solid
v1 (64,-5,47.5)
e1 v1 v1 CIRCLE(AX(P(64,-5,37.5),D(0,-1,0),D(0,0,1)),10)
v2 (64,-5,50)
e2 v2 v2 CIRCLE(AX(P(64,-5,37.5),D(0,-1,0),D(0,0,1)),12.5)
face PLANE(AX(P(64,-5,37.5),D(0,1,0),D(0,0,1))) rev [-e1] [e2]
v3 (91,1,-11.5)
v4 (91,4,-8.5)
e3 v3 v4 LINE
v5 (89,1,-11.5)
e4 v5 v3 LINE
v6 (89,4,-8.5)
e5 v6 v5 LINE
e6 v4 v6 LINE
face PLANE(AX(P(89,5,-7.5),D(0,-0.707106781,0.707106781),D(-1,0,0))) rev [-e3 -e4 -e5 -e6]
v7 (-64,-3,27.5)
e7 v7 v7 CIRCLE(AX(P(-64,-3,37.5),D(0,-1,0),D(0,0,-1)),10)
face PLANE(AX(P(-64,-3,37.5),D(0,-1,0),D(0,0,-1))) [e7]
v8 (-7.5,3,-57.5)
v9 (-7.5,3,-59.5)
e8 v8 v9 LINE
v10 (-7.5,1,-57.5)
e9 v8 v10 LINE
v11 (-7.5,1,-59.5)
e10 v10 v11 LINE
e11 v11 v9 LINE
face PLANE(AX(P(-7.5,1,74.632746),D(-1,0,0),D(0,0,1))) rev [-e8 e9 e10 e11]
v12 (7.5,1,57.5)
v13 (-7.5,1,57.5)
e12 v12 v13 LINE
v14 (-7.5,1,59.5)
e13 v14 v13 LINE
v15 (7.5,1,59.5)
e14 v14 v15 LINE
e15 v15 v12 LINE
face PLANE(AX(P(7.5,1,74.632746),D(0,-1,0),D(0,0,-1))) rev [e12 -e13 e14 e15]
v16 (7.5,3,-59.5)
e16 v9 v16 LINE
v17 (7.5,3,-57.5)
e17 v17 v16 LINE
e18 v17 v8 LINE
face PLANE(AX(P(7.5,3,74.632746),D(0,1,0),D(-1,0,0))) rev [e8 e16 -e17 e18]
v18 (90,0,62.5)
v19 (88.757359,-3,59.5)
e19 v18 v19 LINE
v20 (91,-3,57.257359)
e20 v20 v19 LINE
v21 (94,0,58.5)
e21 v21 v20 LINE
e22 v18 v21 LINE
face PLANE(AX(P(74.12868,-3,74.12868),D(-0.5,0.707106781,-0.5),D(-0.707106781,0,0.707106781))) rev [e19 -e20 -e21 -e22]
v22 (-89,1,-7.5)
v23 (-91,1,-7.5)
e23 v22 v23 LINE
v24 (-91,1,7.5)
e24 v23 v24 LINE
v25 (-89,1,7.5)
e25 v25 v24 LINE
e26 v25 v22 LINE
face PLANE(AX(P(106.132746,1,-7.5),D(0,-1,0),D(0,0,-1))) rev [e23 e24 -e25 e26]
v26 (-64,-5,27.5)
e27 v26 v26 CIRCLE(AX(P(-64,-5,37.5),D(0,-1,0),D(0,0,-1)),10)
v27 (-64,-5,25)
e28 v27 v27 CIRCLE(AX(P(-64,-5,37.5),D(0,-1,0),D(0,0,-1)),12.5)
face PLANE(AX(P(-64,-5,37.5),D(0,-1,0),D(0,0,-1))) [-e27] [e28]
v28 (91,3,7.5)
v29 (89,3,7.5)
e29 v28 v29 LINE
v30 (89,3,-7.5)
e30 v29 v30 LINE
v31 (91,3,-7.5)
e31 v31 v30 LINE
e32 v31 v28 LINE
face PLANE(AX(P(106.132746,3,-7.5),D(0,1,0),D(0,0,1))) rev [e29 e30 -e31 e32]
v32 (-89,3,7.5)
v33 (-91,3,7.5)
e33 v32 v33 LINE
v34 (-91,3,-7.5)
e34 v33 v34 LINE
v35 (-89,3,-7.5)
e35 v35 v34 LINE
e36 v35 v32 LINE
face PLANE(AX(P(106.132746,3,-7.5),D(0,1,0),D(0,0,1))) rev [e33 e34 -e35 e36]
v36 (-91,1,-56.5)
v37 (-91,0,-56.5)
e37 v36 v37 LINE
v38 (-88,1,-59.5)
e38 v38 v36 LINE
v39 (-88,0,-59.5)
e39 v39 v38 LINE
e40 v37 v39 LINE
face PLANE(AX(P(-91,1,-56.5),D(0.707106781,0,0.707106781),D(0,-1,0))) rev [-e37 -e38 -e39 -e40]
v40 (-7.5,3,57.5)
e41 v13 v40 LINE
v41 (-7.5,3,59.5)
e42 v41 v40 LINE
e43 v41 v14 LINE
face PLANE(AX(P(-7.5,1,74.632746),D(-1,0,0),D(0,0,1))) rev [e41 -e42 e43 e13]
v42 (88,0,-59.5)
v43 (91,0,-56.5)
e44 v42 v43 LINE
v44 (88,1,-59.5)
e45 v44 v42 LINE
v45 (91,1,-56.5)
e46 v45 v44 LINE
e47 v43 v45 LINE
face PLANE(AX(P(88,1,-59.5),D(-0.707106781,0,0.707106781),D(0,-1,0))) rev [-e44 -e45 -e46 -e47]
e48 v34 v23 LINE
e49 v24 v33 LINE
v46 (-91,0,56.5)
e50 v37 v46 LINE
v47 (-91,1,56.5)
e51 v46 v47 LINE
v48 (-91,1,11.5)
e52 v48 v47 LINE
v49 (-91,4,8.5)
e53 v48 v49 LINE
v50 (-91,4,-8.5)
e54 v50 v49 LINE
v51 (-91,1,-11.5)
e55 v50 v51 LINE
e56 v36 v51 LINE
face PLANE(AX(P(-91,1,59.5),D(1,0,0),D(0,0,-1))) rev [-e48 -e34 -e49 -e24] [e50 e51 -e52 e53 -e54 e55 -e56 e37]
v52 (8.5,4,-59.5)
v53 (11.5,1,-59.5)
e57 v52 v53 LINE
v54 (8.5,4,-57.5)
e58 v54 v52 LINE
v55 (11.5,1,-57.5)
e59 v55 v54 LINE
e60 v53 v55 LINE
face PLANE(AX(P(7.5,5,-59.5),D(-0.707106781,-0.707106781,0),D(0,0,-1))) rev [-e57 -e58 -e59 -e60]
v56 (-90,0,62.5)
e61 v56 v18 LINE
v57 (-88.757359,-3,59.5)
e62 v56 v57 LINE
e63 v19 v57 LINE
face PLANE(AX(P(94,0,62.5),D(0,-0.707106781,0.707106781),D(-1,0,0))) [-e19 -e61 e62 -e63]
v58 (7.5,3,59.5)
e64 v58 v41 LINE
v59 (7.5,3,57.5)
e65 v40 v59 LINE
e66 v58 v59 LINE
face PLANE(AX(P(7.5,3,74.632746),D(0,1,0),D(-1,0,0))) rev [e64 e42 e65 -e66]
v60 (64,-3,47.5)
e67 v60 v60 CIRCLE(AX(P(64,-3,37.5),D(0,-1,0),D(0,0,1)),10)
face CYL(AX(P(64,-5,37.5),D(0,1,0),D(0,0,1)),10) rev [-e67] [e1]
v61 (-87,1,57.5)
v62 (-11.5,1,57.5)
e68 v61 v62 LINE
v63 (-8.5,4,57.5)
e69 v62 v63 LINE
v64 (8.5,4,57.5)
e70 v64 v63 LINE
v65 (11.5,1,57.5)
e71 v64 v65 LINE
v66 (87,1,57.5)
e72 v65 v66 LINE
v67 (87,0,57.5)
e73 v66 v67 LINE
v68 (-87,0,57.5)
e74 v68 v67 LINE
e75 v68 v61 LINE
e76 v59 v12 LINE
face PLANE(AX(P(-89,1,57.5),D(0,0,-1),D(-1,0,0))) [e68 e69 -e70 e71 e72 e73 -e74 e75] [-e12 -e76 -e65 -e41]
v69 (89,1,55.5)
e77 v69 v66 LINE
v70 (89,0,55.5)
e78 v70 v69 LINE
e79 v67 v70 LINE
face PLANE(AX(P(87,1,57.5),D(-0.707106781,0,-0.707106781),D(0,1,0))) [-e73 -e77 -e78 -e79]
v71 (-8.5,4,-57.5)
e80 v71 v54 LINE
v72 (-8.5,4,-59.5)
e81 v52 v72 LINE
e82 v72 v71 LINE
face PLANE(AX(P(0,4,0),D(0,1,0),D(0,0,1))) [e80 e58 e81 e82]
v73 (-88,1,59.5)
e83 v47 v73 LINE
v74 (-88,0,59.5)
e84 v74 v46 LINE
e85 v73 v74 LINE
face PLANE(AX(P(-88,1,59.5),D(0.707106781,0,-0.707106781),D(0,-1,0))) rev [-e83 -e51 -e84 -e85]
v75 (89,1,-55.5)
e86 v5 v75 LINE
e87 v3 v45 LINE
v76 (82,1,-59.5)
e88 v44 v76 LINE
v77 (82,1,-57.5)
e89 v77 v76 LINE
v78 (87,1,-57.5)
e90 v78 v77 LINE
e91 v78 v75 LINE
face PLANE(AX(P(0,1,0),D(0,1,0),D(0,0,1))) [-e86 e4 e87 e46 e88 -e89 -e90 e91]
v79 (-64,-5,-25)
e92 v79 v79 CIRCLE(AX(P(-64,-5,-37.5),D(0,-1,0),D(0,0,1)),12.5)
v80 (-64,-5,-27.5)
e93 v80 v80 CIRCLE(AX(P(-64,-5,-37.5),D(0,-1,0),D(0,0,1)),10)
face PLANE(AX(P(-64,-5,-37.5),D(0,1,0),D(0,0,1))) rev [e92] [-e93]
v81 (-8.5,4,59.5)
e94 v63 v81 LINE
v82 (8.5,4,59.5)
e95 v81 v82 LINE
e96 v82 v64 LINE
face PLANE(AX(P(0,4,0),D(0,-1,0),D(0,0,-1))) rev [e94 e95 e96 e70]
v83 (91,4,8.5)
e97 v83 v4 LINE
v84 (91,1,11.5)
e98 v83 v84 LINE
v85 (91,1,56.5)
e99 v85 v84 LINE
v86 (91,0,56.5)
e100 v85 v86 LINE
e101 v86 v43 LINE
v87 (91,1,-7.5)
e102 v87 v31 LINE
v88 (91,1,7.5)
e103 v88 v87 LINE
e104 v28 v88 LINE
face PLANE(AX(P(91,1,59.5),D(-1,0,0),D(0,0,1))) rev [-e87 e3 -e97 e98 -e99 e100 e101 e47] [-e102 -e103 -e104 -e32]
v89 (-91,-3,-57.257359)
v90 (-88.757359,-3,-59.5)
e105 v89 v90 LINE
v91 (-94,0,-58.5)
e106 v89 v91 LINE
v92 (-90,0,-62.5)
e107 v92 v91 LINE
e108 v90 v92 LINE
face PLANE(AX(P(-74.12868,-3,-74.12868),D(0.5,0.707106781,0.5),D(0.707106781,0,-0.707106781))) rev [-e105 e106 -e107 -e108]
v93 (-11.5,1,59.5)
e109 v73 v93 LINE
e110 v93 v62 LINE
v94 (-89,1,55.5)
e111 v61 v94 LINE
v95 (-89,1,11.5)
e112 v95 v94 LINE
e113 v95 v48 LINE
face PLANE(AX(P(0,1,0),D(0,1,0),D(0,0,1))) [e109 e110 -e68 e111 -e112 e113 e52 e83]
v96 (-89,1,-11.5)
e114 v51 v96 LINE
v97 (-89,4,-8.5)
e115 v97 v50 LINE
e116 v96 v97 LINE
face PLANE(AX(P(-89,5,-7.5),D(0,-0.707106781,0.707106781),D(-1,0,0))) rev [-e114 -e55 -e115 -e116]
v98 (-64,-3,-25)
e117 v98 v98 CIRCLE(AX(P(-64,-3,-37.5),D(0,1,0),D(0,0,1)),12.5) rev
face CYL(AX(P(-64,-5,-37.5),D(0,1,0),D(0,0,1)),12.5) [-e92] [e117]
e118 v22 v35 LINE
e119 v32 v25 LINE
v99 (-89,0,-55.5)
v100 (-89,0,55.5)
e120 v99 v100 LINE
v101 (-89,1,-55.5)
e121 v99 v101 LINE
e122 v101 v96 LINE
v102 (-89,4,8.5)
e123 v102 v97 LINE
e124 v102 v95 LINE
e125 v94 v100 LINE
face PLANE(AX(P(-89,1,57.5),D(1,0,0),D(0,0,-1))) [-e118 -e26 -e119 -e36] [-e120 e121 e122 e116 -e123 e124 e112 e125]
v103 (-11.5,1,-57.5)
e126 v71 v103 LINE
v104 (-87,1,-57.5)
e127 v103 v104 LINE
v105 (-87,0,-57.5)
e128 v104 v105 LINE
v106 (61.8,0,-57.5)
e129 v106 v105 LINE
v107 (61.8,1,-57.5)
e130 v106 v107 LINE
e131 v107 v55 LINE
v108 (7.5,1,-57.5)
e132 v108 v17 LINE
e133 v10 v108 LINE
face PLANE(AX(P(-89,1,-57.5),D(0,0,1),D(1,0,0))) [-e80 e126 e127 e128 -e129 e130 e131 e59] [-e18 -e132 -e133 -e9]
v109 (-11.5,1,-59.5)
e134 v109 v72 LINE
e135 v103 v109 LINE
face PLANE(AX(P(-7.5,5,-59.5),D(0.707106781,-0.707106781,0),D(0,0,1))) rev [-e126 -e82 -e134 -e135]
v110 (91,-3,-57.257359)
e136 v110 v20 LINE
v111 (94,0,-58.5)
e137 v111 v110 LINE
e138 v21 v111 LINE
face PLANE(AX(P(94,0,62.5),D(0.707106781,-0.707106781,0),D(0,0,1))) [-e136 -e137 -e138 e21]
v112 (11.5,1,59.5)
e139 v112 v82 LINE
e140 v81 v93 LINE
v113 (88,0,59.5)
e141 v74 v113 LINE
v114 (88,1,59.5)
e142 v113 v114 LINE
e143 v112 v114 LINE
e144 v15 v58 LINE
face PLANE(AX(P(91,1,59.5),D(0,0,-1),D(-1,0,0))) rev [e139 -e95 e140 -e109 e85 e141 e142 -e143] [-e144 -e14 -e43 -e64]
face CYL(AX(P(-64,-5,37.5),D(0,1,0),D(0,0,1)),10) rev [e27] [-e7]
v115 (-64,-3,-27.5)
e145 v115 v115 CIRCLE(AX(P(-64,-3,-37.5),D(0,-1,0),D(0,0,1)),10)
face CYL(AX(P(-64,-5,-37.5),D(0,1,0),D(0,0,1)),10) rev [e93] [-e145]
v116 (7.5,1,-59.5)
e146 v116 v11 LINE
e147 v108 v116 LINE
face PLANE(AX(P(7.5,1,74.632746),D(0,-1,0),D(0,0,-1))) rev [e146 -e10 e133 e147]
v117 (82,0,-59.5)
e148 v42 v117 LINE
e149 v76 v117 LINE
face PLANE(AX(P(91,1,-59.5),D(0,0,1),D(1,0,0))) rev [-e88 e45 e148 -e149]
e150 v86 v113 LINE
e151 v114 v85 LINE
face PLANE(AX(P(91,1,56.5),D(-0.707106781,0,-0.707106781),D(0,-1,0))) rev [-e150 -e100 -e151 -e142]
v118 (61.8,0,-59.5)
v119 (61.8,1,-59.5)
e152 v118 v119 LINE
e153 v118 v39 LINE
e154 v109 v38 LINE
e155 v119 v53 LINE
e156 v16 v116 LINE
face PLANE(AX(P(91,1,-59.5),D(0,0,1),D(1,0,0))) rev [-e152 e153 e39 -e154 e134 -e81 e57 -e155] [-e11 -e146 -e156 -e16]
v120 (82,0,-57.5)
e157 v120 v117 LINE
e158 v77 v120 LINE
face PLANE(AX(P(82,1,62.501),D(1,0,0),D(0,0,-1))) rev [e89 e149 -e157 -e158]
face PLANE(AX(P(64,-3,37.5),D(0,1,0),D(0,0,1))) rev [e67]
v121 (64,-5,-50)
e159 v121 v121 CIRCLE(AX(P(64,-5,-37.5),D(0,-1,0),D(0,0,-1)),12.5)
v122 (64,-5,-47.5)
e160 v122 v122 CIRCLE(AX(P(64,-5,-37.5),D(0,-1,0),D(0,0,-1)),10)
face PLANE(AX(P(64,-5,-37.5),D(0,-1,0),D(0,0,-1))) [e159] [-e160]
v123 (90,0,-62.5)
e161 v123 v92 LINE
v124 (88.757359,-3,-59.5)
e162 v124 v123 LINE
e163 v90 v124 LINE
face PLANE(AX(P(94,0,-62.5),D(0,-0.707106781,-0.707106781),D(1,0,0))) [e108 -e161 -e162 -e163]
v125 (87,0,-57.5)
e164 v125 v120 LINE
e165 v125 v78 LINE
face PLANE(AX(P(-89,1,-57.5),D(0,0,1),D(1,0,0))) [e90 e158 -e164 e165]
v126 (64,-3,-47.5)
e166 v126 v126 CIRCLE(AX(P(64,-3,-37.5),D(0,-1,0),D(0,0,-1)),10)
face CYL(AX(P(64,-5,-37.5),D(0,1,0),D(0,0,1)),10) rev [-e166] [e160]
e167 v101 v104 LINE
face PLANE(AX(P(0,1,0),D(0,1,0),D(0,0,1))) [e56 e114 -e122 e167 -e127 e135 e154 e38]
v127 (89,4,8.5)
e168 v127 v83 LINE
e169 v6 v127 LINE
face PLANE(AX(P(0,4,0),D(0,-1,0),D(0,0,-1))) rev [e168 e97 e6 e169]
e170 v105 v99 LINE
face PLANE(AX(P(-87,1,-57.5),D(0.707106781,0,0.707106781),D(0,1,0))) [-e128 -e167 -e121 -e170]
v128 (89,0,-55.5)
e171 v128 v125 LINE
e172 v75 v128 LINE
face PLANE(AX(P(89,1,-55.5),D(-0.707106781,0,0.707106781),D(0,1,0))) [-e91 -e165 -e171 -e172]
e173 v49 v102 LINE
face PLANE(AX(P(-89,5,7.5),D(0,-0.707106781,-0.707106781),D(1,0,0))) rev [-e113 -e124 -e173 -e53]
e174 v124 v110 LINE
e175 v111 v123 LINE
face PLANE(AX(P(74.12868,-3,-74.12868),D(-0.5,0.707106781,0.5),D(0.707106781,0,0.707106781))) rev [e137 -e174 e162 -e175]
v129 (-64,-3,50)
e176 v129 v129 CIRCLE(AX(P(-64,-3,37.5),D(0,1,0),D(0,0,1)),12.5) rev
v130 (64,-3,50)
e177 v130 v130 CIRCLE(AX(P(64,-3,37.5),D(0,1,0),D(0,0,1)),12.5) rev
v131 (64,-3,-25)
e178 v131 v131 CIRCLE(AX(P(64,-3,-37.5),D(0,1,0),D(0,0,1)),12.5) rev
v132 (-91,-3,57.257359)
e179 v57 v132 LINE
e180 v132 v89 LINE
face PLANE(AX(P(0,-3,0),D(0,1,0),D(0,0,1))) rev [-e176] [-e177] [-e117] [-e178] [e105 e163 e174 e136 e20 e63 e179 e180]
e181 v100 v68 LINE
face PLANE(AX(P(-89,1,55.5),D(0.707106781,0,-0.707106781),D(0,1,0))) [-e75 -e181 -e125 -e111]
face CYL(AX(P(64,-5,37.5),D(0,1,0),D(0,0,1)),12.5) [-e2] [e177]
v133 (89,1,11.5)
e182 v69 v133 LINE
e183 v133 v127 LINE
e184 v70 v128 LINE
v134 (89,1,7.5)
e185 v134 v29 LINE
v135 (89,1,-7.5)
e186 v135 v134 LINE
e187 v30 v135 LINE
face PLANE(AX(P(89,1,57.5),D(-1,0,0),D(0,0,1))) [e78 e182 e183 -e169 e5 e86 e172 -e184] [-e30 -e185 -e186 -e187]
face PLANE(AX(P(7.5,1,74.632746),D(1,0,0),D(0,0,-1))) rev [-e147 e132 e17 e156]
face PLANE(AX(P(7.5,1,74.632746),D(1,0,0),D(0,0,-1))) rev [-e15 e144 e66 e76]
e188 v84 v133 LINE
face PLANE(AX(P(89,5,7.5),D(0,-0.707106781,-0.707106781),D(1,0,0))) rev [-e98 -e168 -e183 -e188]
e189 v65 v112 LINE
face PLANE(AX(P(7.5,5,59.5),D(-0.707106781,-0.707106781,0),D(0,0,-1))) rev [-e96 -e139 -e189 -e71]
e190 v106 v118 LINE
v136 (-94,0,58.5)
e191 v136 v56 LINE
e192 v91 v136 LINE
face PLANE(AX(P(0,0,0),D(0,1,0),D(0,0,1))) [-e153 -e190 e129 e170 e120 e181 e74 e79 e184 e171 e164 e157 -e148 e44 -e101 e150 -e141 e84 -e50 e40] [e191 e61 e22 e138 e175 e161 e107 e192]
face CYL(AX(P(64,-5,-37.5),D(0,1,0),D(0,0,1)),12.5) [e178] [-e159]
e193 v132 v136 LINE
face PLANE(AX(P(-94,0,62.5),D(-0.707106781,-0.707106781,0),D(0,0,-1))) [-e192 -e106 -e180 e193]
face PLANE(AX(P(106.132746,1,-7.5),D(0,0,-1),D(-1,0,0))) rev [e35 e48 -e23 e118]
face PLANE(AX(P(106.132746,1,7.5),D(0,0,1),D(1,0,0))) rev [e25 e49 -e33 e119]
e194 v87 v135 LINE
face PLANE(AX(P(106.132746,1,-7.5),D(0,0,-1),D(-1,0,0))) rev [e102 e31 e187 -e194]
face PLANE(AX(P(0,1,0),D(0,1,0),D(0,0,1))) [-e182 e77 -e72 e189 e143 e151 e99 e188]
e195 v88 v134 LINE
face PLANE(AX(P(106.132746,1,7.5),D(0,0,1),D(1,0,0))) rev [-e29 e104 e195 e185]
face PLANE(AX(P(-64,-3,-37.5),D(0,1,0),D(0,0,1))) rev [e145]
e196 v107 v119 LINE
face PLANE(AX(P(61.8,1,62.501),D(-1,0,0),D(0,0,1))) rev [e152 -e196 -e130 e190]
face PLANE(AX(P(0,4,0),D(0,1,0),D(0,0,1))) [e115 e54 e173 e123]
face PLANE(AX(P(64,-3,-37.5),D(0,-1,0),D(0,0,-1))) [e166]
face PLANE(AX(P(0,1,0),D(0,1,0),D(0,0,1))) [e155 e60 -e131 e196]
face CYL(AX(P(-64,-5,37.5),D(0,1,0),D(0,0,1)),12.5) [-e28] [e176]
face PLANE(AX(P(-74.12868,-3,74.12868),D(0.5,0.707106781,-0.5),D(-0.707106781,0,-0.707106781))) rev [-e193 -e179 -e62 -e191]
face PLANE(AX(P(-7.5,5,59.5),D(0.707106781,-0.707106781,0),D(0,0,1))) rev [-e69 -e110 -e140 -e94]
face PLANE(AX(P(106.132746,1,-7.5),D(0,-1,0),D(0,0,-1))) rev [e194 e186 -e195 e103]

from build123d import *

# Parameters (mm, degrees)
SKETCH_1_W          = 188
SKETCH_1_H          = 125
EXTRUDE_1_DEPTH     = 3
SKETCH_2_W          = 182
SKETCH_2_H          = 119
SKETCH_2_W_2        = 178
SKETCH_2_H_2        = 115
EXTRUDE_2_DEPTH     = 1
CUT_EXTRUDE_1_REACH = 156.042
SKETCH_4_W          = 20.2
SKETCH_4_H          = 1
SKETCH_5_W          = 15
SKETCH_5_H          = 2
SKETCH_5_W_2        = 2
SKETCH_5_H_2        = 15
EXTRUDE_3_DEPTH     = 3
CHAMFER_1_SIZE      = 4
CUT_EXTRUDE_2_REACH = 156.065
SKETCH_6_W          = 15
SKETCH_6_H          = 2
CUT_EXTRUDE_3_REACH = 197.313
SKETCH_7_W          = 15
SKETCH_7_H          = 2
SKETCH_8_R          = 12.5
EXTRUDE_4_DEPTH     = 2
SKETCH_9_R          = 10
CUT_EXTRUDE_4_DEPTH = 2
CHAMFER_2_SIZE      = 4
CHAMFER_3_SIZE      = 3
CHAMFER_4_SIZE      = 2
CHAMFER_5_SIZE      = 3


# Some blends are built 0.0001 mm under size
with BuildPart() as part:
    # 草图1 → 凸台-拉伸1 (new body)
    with BuildSketch(Plane(origin=(0, 0, 0), x_dir=(1, 0, 0), z_dir=(0, 1, 0))):
        Rectangle(SKETCH_1_W, SKETCH_1_H)
    extrude(amount=-EXTRUDE_1_DEPTH)

    # 草图2 → 凸台-拉伸2 (add)
    with BuildSketch(Plane(origin=(0, 0, 0), x_dir=(1, 0, 0), z_dir=(0, 1, 0))):
        Rectangle(SKETCH_2_W, SKETCH_2_H)
        Rectangle(SKETCH_2_W_2, SKETCH_2_H_2, mode=Mode.SUBTRACT)
    extrude(amount=EXTRUDE_2_DEPTH)

    # 草图4 → 切除-拉伸1 (cut, up to next)
    with BuildSketch(Plane(origin=(0, 0, -59.5), x_dir=(-1, 0, 0), z_dir=(0, 0, -1)), mode=Mode.PRIVATE) as cut_extrude_1_sk1:
        with Locations((-71.9, 0.5)):
            Rectangle(SKETCH_4_W, SKETCH_4_H)
    cut_extrude_1_tool1 = extrude(cut_extrude_1_sk1.sketch, amount=-CUT_EXTRUDE_1_REACH, mode=Mode.PRIVATE) & part.part
    add(cut_extrude_1_tool1.solids().sort_by_distance((71.9, 0.5, -59.5))[0], mode=Mode.SUBTRACT)

    # 草图5 → 凸台-拉伸3 (add)
    with BuildSketch(Plane(origin=(0, 1, 0), x_dir=(1, 0, 0), z_dir=(0, 1, 0))):
        with Locations((0, -58.5)):
            Rectangle(SKETCH_5_W, SKETCH_5_H)
        with Locations((90, 0)):
            Rectangle(SKETCH_5_W_2, SKETCH_5_H_2)
        with Locations((0, 58.5)):
            Rectangle(SKETCH_5_W, SKETCH_5_H)
        with Locations((-90, 0)):
            Rectangle(SKETCH_5_W_2, SKETCH_5_H_2)
    extrude(amount=EXTRUDE_3_DEPTH)

    # 倒角1
    # the kernel refuses this chamfer: 4 mm, written as the material it adds along each edge
    with BuildSketch(Plane(origin=(-89, 1, -7.5), x_dir=(0, -0.027495876610586372, -0.9996219169112968), z_dir=(-1, 0, 0))) as chamfer_1_piece_1_section:
        Polygon((CHAMFER_1_SIZE * 0.999621916911, -CHAMFER_1_SIZE * 0.0274958766106), (-CHAMFER_1_SIZE * 0.0274958766106, -CHAMFER_1_SIZE * 0.999621916911), (0, 0), align=None)
    chamfer_1_piece_1 = extrude(amount=2, mode=Mode.PRIVATE)
    chamfer_1_piece_1 = split(chamfer_1_piece_1, bisect_by=Plane(origin=(-90, 4, -8.907836441), z_dir=(0, -1, 0)), keep=Keep.TOP, mode=Mode.PRIVATE)
    add(chamfer_1_piece_1)
    with BuildSketch(Plane(origin=(-91, 1, 7.5), x_dir=(0, -0.027495876610586382, 0.9996219169112968), z_dir=(1, 0, 0))) as chamfer_1_piece_2_section:
        Polygon((CHAMFER_1_SIZE * 0.999621916911, -CHAMFER_1_SIZE * 0.0274958766106), (-CHAMFER_1_SIZE * 0.0274958766106, -CHAMFER_1_SIZE * 0.999621916911), (0, 0), align=None)
    chamfer_1_piece_2 = extrude(amount=2, mode=Mode.PRIVATE)
    chamfer_1_piece_2 = split(chamfer_1_piece_2, bisect_by=Plane(origin=(-90, 4, 8.907836441), z_dir=(0, -1, 0)), keep=Keep.TOP, mode=Mode.PRIVATE)
    add(chamfer_1_piece_2)
    with BuildSketch(Plane(origin=(-7.5, 1, 57.5), x_dir=(-0.9996219169112968, -0.027495876610586382, 0), z_dir=(0, 0, 1))) as chamfer_1_piece_3_section:
        Polygon((CHAMFER_1_SIZE * 0.999621916911, -CHAMFER_1_SIZE * 0.0274958766106), (-CHAMFER_1_SIZE * 0.0274958766106, -CHAMFER_1_SIZE * 0.999621916911), (0, 0), align=None)
    chamfer_1_piece_3 = extrude(amount=2, mode=Mode.PRIVATE)
    chamfer_1_piece_3 = split(chamfer_1_piece_3, bisect_by=Plane(origin=(-8.907836441, 4, 58.5), z_dir=(0, -1, 0)), keep=Keep.TOP, mode=Mode.PRIVATE)
    add(chamfer_1_piece_3)
    with BuildSketch(Plane(origin=(7.5, 1, 59.5), x_dir=(0.9996219169112968, -0.02749587661058638, 0), z_dir=(0, 0, -1))) as chamfer_1_piece_4_section:
        Polygon((CHAMFER_1_SIZE * 0.999621916911, -CHAMFER_1_SIZE * 0.0274958766106), (-CHAMFER_1_SIZE * 0.0274958766106, -CHAMFER_1_SIZE * 0.999621916911), (0, 0), align=None)
    chamfer_1_piece_4 = extrude(amount=2, mode=Mode.PRIVATE)
    chamfer_1_piece_4 = split(chamfer_1_piece_4, bisect_by=Plane(origin=(8.907836441, 4, 58.5), z_dir=(0, -1, 0)), keep=Keep.TOP, mode=Mode.PRIVATE)
    add(chamfer_1_piece_4)
    with BuildSketch(Plane(origin=(89, 1, 7.5), x_dir=(0, -0.027495876610586372, 0.9996219169112968), z_dir=(1, 0, 0))) as chamfer_1_piece_5_section:
        Polygon((CHAMFER_1_SIZE * 0.999621916911, -CHAMFER_1_SIZE * 0.0274958766106), (-CHAMFER_1_SIZE * 0.0274958766106, -CHAMFER_1_SIZE * 0.999621916911), (0, 0), align=None)
    chamfer_1_piece_5 = extrude(amount=2, mode=Mode.PRIVATE)
    chamfer_1_piece_5 = split(chamfer_1_piece_5, bisect_by=Plane(origin=(90, 4, 8.907836441), z_dir=(0, -1, 0)), keep=Keep.TOP, mode=Mode.PRIVATE)
    add(chamfer_1_piece_5)
    with BuildSketch(Plane(origin=(91, 1, -7.5), x_dir=(0, -0.02749587661058638, -0.9996219169112968), z_dir=(-1, 0, 0))) as chamfer_1_piece_6_section:
        Polygon((CHAMFER_1_SIZE * 0.999621916911, -CHAMFER_1_SIZE * 0.0274958766106), (-CHAMFER_1_SIZE * 0.0274958766106, -CHAMFER_1_SIZE * 0.999621916911), (0, 0), align=None)
    chamfer_1_piece_6 = extrude(amount=2, mode=Mode.PRIVATE)
    chamfer_1_piece_6 = split(chamfer_1_piece_6, bisect_by=Plane(origin=(90, 4, -8.907836441), z_dir=(0, -1, 0)), keep=Keep.TOP, mode=Mode.PRIVATE)
    add(chamfer_1_piece_6)
    with BuildSketch(Plane(origin=(-7.5, 1, -59.5), x_dir=(-0.9996219169112968, -0.02749587661058638, 0), z_dir=(0, 0, 1))) as chamfer_1_piece_7_section:
        Polygon((CHAMFER_1_SIZE * 0.999621916911, -CHAMFER_1_SIZE * 0.0274958766106), (-CHAMFER_1_SIZE * 0.0274958766106, -CHAMFER_1_SIZE * 0.999621916911), (0, 0), align=None)
    chamfer_1_piece_7 = extrude(amount=2, mode=Mode.PRIVATE)
    chamfer_1_piece_7 = split(chamfer_1_piece_7, bisect_by=Plane(origin=(-8.907836441, 4, -58.5), z_dir=(0, -1, 0)), keep=Keep.TOP, mode=Mode.PRIVATE)
    add(chamfer_1_piece_7)
    with BuildSketch(Plane(origin=(7.5, 1, -57.5), x_dir=(0.9996219169112968, -0.027495876610586372, 0), z_dir=(0, 0, -1))) as chamfer_1_piece_8_section:
        Polygon((CHAMFER_1_SIZE * 0.999621916911, -CHAMFER_1_SIZE * 0.0274958766106), (-CHAMFER_1_SIZE * 0.0274958766106, -CHAMFER_1_SIZE * 0.999621916911), (0, 0), align=None)
    chamfer_1_piece_8 = extrude(amount=2, mode=Mode.PRIVATE)
    chamfer_1_piece_8 = split(chamfer_1_piece_8, bisect_by=Plane(origin=(8.907836441, 4, -58.5), z_dir=(0, -1, 0)), keep=Keep.TOP, mode=Mode.PRIVATE)
    add(chamfer_1_piece_8)

    # 切除-拉伸2: up to this face of the body (flat: up to its plane)
    cut_extrude_2_end = Plane(part.part.faces().sort_by_distance((0, 0.977272727, 59.5))[0])
    # 草图6 → 切除-拉伸2 (cut, up to the picked face)
    with BuildSketch(Plane(origin=(0, 0, -59.5), x_dir=(-1, 0, 0), z_dir=(0, 0, -1)), mode=Mode.PRIVATE) as cut_extrude_2_sk1:
        with Locations((0, 2)):
            Rectangle(SKETCH_6_W, SKETCH_6_H)
    cut_extrude_2_tool1 = split(extrude(cut_extrude_2_sk1.sketch, amount=-CUT_EXTRUDE_2_REACH, mode=Mode.PRIVATE), bisect_by=cut_extrude_2_end, keep=Keep.BOTH, mode=Mode.PRIVATE)
    add(cut_extrude_2_tool1.solids().sort_by(Axis((0, 2, -59.5), (0, 0, 1)))[0], mode=Mode.SUBTRACT)

    # 切除-拉伸3: up to this face of the body (flat: up to its plane)
    cut_extrude_3_end = Plane(part.part.faces().sort_by_distance((91, 1.145251397, 0))[0])
    # 草图7 → 切除-拉伸3 (cut, up to the picked face)
    with BuildSketch(Plane.ZY.offset(91), mode=Mode.PRIVATE) as cut_extrude_3_sk1:
        with Locations((0, 2)):
            Rectangle(SKETCH_7_W, SKETCH_7_H)
    cut_extrude_3_tool1 = split(extrude(cut_extrude_3_sk1.sketch, amount=-CUT_EXTRUDE_3_REACH, mode=Mode.PRIVATE), bisect_by=cut_extrude_3_end, keep=Keep.BOTH, mode=Mode.PRIVATE)
    add(cut_extrude_3_tool1.solids().sort_by(Axis((-91, 2, 0), (1, 0, 0)))[0], mode=Mode.SUBTRACT)

    # 草图8 → 凸台-拉伸4 (add)
    with BuildSketch(Plane.XZ.offset(3)):
        with Locations(Location((-64, 37.5, 0), (0, 0, 90))):
            Circle(SKETCH_8_R)
        with Locations(Location((-64, -37.5, 0), (0, 0, 90))):
            Circle(SKETCH_8_R)
        with Locations(Location((64, 37.5, 0), (0, 0, 90))):
            Circle(SKETCH_8_R)
        with Locations(Location((64, -37.5, 0), (0, 0, 90))):
            Circle(SKETCH_8_R)
    extrude(amount=EXTRUDE_4_DEPTH)

    # 草图9 → 切除-拉伸4 (cut)
    with BuildSketch(Plane.XZ.offset(3)):
        with Locations(Location((-64, 37.5, 0), (0, 0, 270))):
            Circle(SKETCH_9_R)
        with Locations(Location((-64, -37.5, 0), (0, 0, 90))):
            Circle(SKETCH_9_R)
        with Locations(Location((64, 37.5, 0), (0, 0, 90))):
            Circle(SKETCH_9_R)
        with Locations(Location((64, -37.5, 0), (0, 0, 270))):
            Circle(SKETCH_9_R)
    extrude(amount=CUT_EXTRUDE_4_DEPTH, mode=Mode.SUBTRACT)

    # 倒角2
    chamfer_2_edges = [part.edges().sort_by_distance(p)[0] for p in [
        (-94, -1.5, -62.5),
        (94, -1.5, -62.5),
        (94, -1.5, 62.5),
        (-94, -1.5, 62.5),
    ]]
    chamfer(chamfer_2_edges, length=CHAMFER_2_SIZE)

    # 倒角3
    chamfer_3_edges = [part.edges().sort_by_distance(p)[0] for p in [
        (92, -3, -60.5),
        (0, -3, -62.5),
        (-92, -3, -60.5),
        (-94, -3, 0),
        (-92, -3, 60.5),
        (0, -3, 62.5),
        (92, -3, 60.5),
        (94, -3, 0),
    ]]
    chamfer(chamfer_3_edges, length=CHAMFER_3_SIZE - 0.0001)  # a hair under: the kernel refuses the full size

    # 倒角4
    chamfer_4_edges = [part.edges().sort_by_distance(p)[0] for p in [
        (-89, 0.5, 57.5),
        (89, 0.5, 57.5),
        (89, 0.5, -57.5),
        (-89, 0.5, -57.5),
    ]]
    chamfer(chamfer_4_edges, length=CHAMFER_4_SIZE)

    # 倒角5
    chamfer_5_edges = [part.edges().sort_by_distance(p)[0] for p in [
        (-91, 0.5, -59.5),
        (-91, 0.5, 59.5),
        (91, 0.5, 59.5),
        (91, 0.5, -59.5),
    ]]
    chamfer(chamfer_5_edges, length=CHAMFER_5_SIZE)


solid = part.part
